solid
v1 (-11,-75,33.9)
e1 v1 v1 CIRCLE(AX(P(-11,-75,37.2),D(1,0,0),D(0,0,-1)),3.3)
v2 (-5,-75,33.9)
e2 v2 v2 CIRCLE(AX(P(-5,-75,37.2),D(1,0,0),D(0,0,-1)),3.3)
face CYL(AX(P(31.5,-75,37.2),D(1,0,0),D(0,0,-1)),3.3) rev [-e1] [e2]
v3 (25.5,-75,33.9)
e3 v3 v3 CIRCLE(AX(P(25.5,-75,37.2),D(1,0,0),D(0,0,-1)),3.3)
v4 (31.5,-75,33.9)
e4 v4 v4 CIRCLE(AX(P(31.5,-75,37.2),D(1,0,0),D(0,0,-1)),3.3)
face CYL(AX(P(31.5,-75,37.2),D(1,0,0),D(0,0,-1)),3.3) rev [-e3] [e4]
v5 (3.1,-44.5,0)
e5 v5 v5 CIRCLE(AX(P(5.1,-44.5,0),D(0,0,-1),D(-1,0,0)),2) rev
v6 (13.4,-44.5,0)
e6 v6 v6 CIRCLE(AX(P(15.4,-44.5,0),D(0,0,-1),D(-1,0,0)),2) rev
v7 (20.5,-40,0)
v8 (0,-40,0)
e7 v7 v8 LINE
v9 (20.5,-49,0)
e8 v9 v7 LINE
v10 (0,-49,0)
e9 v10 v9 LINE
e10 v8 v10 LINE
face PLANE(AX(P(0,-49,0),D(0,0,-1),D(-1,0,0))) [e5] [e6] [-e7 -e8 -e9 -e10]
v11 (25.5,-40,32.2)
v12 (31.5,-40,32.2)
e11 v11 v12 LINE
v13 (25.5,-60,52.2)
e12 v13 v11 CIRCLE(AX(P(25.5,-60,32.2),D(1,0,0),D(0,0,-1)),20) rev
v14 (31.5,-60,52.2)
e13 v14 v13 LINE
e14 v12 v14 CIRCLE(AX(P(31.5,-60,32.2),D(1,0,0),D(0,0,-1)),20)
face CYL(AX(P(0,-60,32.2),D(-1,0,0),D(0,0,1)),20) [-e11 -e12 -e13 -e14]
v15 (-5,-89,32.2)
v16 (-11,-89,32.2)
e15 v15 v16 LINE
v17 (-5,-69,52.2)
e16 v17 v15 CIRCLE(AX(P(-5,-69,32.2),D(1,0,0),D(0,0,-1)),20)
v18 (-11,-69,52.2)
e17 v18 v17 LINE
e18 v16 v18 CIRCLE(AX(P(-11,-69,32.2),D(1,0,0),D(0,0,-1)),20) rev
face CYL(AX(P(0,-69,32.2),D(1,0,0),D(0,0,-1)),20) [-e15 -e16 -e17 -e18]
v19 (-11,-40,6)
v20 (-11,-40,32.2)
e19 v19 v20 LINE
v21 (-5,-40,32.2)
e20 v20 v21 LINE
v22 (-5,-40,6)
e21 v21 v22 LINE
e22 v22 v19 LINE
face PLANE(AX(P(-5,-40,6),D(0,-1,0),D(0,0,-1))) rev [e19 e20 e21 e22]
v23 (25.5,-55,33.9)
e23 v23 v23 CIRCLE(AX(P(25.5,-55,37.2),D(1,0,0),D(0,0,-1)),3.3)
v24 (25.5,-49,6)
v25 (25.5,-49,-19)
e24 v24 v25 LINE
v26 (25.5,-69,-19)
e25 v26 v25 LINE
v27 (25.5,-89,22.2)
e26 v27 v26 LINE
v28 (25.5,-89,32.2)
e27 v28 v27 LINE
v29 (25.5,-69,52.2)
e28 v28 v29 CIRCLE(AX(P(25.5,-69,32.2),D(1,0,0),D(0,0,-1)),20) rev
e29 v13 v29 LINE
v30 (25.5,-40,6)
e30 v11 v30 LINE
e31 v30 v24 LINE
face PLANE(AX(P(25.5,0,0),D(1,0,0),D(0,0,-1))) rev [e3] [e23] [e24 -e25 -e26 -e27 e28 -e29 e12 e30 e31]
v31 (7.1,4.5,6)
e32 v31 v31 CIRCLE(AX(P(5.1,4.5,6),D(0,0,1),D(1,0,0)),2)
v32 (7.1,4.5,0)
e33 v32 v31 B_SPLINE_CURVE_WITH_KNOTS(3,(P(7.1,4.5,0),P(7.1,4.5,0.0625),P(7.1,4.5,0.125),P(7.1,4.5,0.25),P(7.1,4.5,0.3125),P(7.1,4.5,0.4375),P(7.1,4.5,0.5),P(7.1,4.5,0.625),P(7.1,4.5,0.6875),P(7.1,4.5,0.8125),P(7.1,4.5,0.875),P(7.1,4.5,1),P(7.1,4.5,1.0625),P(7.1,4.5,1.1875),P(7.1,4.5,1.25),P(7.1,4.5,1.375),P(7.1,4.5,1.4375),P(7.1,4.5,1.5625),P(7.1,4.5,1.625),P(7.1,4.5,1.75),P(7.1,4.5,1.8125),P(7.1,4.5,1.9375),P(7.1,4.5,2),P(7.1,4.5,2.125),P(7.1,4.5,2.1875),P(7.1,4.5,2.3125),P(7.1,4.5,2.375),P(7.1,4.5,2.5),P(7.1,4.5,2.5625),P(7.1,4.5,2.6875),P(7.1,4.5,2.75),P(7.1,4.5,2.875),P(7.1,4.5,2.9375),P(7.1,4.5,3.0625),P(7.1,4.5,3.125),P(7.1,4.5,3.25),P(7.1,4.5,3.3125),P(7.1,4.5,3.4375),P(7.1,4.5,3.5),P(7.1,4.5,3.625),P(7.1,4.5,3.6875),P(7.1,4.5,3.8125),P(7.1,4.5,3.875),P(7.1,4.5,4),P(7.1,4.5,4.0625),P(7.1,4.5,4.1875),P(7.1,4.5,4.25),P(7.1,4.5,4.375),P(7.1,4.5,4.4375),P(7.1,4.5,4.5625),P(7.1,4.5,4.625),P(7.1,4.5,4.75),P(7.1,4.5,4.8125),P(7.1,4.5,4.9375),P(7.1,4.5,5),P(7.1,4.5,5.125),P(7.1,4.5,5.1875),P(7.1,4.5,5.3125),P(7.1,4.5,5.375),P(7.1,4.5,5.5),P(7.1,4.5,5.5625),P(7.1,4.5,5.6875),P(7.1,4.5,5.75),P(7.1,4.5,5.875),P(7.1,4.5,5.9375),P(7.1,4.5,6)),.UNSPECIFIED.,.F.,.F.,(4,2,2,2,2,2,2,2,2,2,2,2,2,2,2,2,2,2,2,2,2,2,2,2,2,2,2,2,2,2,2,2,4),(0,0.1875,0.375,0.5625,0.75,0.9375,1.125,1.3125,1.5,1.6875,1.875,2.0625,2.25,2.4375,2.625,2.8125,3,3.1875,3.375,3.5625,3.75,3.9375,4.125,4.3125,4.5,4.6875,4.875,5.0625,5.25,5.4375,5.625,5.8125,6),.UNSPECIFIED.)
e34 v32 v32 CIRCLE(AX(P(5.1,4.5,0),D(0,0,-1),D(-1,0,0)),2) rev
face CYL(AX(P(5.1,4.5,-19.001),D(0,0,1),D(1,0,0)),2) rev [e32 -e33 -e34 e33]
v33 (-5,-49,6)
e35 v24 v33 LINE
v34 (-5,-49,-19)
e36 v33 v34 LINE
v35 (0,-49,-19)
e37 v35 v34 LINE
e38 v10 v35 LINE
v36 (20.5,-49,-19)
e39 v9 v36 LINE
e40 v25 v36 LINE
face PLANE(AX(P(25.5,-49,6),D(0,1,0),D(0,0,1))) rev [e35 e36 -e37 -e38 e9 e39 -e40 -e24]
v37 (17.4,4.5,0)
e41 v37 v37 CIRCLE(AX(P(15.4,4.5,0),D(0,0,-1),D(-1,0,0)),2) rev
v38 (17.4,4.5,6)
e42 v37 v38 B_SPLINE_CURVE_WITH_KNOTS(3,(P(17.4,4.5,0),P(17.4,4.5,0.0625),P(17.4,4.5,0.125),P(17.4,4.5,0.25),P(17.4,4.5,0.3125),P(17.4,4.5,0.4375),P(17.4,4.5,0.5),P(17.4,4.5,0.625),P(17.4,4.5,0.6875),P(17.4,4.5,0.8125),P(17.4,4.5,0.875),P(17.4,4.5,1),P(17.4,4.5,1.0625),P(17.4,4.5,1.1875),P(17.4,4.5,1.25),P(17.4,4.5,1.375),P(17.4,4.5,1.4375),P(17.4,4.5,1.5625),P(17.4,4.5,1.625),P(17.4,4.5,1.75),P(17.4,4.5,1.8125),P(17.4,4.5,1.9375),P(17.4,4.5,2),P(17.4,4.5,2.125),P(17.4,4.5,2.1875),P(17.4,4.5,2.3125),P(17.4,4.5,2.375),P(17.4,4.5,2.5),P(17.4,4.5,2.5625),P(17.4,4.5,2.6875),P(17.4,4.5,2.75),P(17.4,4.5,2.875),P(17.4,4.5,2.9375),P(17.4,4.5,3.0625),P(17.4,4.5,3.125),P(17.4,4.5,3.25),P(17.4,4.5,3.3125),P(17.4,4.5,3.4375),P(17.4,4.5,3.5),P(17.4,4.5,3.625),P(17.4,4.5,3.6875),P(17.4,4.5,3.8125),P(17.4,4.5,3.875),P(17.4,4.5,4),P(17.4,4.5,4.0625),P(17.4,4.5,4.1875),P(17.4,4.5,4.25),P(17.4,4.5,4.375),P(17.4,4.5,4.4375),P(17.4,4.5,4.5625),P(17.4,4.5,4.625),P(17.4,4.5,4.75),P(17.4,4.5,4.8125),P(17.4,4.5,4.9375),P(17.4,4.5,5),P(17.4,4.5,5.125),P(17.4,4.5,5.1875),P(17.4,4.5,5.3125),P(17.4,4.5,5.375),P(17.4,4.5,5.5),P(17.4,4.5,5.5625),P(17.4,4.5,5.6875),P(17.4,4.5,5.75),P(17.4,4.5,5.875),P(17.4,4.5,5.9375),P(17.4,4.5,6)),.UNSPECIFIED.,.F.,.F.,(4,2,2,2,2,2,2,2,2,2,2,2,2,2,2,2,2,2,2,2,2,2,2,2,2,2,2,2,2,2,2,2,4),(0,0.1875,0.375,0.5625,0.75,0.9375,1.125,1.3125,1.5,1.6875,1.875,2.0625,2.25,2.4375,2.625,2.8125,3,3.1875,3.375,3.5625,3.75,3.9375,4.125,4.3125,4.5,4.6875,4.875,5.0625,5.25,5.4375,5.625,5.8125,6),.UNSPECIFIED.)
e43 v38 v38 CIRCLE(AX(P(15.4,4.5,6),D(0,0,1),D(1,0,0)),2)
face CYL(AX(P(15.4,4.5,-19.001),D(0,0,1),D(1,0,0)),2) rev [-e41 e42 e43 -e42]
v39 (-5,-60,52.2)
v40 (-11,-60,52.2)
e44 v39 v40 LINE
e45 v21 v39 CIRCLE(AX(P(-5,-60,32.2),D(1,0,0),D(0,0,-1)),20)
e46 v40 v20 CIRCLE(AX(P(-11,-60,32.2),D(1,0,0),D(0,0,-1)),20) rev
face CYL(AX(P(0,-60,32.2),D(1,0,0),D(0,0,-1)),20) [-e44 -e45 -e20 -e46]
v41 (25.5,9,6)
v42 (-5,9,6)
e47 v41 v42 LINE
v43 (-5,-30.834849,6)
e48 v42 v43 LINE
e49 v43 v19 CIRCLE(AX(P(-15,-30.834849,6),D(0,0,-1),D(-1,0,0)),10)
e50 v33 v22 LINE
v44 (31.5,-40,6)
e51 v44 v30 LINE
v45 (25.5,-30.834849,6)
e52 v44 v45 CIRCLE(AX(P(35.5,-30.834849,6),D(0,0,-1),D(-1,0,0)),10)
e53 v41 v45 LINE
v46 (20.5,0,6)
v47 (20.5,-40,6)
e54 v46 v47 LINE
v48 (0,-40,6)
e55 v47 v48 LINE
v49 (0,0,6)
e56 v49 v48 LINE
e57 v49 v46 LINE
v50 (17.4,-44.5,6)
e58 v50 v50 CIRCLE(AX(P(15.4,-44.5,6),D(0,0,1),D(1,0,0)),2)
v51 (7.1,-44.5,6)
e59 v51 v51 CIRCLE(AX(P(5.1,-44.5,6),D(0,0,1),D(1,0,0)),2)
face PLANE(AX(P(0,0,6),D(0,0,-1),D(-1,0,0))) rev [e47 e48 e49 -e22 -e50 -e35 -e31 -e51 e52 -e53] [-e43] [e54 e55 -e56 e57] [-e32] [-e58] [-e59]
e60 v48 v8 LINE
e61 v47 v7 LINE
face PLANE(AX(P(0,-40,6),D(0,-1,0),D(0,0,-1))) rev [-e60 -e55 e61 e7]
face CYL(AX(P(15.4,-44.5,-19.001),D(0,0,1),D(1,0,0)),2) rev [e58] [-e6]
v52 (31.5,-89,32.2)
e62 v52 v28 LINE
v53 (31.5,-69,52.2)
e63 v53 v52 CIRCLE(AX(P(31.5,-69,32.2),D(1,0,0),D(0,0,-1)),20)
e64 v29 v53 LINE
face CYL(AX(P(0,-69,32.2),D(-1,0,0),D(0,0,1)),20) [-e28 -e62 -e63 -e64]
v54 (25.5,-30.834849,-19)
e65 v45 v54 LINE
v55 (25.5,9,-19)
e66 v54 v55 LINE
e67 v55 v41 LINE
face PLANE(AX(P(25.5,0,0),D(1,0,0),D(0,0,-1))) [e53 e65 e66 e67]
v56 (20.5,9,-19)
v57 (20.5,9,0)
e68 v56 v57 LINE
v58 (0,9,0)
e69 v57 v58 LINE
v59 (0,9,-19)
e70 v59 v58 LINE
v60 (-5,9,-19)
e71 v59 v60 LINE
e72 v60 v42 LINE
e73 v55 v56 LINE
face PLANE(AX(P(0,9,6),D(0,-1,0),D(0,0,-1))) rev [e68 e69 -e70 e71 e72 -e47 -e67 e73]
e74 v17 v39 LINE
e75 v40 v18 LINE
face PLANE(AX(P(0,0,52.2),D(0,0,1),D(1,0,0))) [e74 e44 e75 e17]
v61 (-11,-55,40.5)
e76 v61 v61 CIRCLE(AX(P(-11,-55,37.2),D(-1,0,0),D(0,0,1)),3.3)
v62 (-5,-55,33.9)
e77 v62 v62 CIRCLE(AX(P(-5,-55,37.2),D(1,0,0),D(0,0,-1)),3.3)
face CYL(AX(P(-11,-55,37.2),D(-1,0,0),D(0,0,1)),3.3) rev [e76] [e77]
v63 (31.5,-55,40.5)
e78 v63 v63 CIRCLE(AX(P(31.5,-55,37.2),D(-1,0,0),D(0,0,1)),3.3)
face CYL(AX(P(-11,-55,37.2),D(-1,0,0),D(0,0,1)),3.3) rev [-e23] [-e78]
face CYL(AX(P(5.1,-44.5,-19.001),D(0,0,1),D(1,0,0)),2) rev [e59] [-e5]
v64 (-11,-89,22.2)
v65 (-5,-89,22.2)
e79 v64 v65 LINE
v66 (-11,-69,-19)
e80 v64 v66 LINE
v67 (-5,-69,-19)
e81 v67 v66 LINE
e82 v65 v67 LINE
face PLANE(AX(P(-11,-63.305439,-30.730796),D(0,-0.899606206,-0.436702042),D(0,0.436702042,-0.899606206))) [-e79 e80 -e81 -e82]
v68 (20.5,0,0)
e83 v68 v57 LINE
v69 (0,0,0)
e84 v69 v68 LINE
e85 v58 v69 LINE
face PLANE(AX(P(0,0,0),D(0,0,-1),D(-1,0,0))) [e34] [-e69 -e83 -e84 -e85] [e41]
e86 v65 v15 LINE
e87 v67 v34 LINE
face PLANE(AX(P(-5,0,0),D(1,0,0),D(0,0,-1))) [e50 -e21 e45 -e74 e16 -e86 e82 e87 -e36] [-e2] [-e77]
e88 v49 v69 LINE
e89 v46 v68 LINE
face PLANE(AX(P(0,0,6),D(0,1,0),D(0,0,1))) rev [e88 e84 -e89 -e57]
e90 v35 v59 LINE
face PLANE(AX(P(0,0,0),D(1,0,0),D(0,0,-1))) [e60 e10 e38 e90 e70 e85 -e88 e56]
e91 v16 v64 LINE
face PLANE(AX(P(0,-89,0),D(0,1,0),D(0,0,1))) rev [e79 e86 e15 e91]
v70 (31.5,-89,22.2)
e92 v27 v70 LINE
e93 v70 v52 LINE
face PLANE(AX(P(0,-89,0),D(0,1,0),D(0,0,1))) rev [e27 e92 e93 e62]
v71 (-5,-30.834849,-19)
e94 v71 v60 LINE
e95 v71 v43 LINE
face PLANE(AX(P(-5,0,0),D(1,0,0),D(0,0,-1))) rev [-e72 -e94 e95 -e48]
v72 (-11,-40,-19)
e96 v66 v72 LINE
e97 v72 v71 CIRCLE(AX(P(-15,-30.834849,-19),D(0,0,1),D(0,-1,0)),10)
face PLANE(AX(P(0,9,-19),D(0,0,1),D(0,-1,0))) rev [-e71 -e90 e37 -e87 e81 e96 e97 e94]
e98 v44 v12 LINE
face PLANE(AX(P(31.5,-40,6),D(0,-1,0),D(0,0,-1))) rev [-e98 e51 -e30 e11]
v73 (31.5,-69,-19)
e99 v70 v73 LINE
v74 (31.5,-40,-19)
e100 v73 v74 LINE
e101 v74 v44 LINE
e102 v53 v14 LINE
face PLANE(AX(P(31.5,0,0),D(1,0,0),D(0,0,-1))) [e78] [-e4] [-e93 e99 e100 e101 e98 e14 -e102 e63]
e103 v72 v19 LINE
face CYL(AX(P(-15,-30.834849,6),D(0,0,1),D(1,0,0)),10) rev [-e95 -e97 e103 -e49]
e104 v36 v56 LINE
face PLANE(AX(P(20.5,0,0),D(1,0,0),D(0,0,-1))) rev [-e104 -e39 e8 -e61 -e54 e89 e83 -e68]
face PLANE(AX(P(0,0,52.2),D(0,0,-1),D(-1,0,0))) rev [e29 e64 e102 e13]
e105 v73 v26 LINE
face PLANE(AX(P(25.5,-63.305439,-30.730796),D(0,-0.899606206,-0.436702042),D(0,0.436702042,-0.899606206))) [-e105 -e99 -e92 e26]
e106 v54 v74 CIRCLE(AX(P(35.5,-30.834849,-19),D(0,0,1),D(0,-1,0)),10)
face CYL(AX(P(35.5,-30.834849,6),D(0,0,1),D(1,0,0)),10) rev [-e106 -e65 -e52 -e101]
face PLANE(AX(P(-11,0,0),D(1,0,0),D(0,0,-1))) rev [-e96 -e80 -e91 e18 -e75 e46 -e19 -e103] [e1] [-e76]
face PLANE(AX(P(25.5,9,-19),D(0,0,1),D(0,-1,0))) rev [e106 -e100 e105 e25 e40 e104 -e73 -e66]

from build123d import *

# Parameters (mm, degrees)
SKETCH1_W            = 20.5
SKETCH1_H            = 9
BOSS_EXTRUDE1_DEPTH  = 6
SKETCH2_W            = 25
SKETCH2_H            = 58
BOSS_EXTRUDE2_DEPTH  = 5
LPATTERN1_COUNT      = 2
LPATTERN1_PITCH      = 49
LPATTERN2_COUNT      = 2
LPATTERN2_PITCH      = 25.5
CUT_EXTRUDE1_REACH   = 62.632
SKETCH3_R            = 2
LPATTERN3_COUNT      = 2
LPATTERN3_PITCH      = 10.3
LPATTERN3_COUNT_DIR2 = 2
LPATTERN3_PITCH_DIR2 = 49
SKETCH4_W            = 25
SKETCH4_H            = 29
BOSS_EXTRUDE3_DEPTH  = 6
LPATTERN4_COUNT      = 2
LPATTERN4_PITCH      = 36.5
SKETCH6_W            = 6
SKETCH6_H            = 29
BOSS_EXTRUDE5_DEPTH  = 46.2
FILLET1_R            = 10
M6_CLEARANCE_HOLE1_D = 6.6
SKETCH9_W            = 6
SKETCH9_H            = 30
BOSS_EXTRUDE6_DEPTH  = 20
BOSS_EXTRUDE7_DEPTH  = 6
LPATTERN5_COUNT      = 2
LPATTERN5_PITCH      = 36.5
FILLET2_R            = 20
M6_CLEARANCE_HOLE2_D = 6.6


with BuildPart() as part:
    # Sketch1 → Boss-Extrude1 (new body)
    with BuildSketch(Plane.XY):
        with Locations((10.25, 4.5)):
            Rectangle(SKETCH1_W, SKETCH1_H)
    boss_extrude1 = extrude(amount=BOSS_EXTRUDE1_DEPTH)

    # Sketch2 → Boss-Extrude2 (add)
    with BuildSketch(Plane(origin=(20.5, 0, 0), x_dir=(0, 0, -1), z_dir=(1, 0, 0))):
        with Locations((6.5, -20)):
            Rectangle(SKETCH2_W, SKETCH2_H)
    boss_extrude2 = extrude(amount=BOSS_EXTRUDE2_DEPTH)

    # LPattern1: Boss-Extrude1 ×2
    with Locations(*[(0, -i * LPATTERN1_PITCH, 0) for i in range(1, LPATTERN1_COUNT)]):
        add(boss_extrude1)

    # LPattern2: Boss-Extrude2 ×2
    with Locations(*[(-i * LPATTERN2_PITCH, 0, 0) for i in range(1, LPATTERN2_COUNT)]):
        add(boss_extrude2)

    # Sketch3 → Cut-Extrude1 (cut, up to next)
    with BuildSketch(Plane.XY.offset(6), mode=Mode.PRIVATE) as cut_extrude1_sk1:
        with Locations((5.1, 4.5)):
            Circle(SKETCH3_R)
    cut_extrude1_tool1 = extrude(cut_extrude1_sk1.sketch, amount=-CUT_EXTRUDE1_REACH, mode=Mode.PRIVATE) & part.part
    cut_extrude1 = cut_extrude1_tool1.solids().sort_by_distance((5.1, 4.5, 6))[0]
    add(cut_extrude1, mode=Mode.SUBTRACT)

    # LPattern3: Cut-Extrude1 2 × 2
    with Locations(*[(i * LPATTERN3_PITCH, -j * LPATTERN3_PITCH_DIR2, 0) for i in range(LPATTERN3_COUNT) for j in range(LPATTERN3_COUNT_DIR2) if (i, j) != (0, 0)]):
        add(cut_extrude1, mode=Mode.SUBTRACT)

    # Sketch4 → Boss-Extrude3 (add)
    with BuildSketch(Plane(origin=(25.5, 0, 0), x_dir=(0, 0, -1), z_dir=(1, 0, 0))):
        with Locations((6.5, -54.5)):
            Rectangle(SKETCH4_W, SKETCH4_H)
    boss_extrude3 = extrude(amount=BOSS_EXTRUDE3_DEPTH)

    # LPattern4: Boss-Extrude3 ×2
    with Locations(*[(-i * LPATTERN4_PITCH, 0, 0) for i in range(1, LPATTERN4_COUNT)]):
        add(boss_extrude3)

    # Sketch6 → Boss-Extrude5 (add)
    with BuildSketch(Plane.XY.offset(6)):
        with Locations((28.5, -54.5)):
            Rectangle(SKETCH6_W, SKETCH6_H)
        with Locations((-8, -54.5)):
            Rectangle(SKETCH6_W, SKETCH6_H)
    extrude(amount=BOSS_EXTRUDE5_DEPTH)

    # Fillet1
    # the kernel refuses this fillet: 10 mm, written as the material it adds along each edge
    with BuildSketch(Plane(origin=(25.5, -40, 6), x_dir=(0, 1, 0), z_dir=(0, 0, -1))) as fillet1_piece_1:
        with BuildLine():
            CenterArc((9.16515139, 10), FILLET1_R, 203.578178478, 66.421821522)
            Line((0, 6), (0, 0))
            Line((0, 0), (9.16515139, 0))
        make_face()
    extrude(amount=25)
    with BuildSketch(Plane(origin=(-5, -40, 6), x_dir=(-1, 0, 0), z_dir=(0, 0, -1))) as fillet1_piece_2:
        with BuildLine():
            CenterArc((10, 9.16515139), FILLET1_R, 180, 66.421821522)
            Line((0, 9.16515139), (0, 0))
            Line((0, 0), (6, 0))
        make_face()
    extrude(amount=25)

    # M6 Clearance Hole1 (through all)
    with Locations(Plane.ZY.offset(11)):
        with Locations((37.2, -55)):
            Hole(M6_CLEARANCE_HOLE1_D / 2)

    # Sketch9 → Boss-Extrude6 (add)
    with BuildSketch(Plane.XZ.offset(69)):
        with Locations((28.5, 37.2)):
            Rectangle(SKETCH9_W, SKETCH9_H)
        with Locations((-8, 37.2)):
            Rectangle(SKETCH9_W, SKETCH9_H)
    extrude(amount=BOSS_EXTRUDE6_DEPTH)

    # Sketch10 → Boss-Extrude7 (add)
    with BuildSketch(Plane(origin=(31.5, 0, 0), x_dir=(0, 0, -1), z_dir=(1, 0, 0))):
        Polygon((-22.2, -80.626229403), (-22.2, -89), (19, -69), (-19.89821605, -69), align=None)
        Polygon((-22.2, -69), (-22.2, -80.626229403), (-19.89821605, -69), align=None)
    boss_extrude7 = extrude(amount=-BOSS_EXTRUDE7_DEPTH)

    # LPattern5: Boss-Extrude7 ×2
    with Locations(*[(-i * LPATTERN5_PITCH, 0, 0) for i in range(1, LPATTERN5_COUNT)]):
        add(boss_extrude7)

    # Fillet2
    fillet2_edges = [part.edges().sort_by_distance(p)[0] for p in [
        (28.5, -40, 52.2),
        (-8, -40, 52.2),
        (28.5, -89, 52.2),
        (-8, -89, 52.2),
    ]]
    fillet(fillet2_edges, radius=FILLET2_R)

    # M6 Clearance Hole2 (through all)
    with Locations(Plane(origin=(31.5, 0, 0), x_dir=(0, 0, -1), z_dir=(1, 0, 0))):
        with Locations((-37.2, -75)):
            Hole(M6_CLEARANCE_HOLE2_D / 2)


solid = part.part
